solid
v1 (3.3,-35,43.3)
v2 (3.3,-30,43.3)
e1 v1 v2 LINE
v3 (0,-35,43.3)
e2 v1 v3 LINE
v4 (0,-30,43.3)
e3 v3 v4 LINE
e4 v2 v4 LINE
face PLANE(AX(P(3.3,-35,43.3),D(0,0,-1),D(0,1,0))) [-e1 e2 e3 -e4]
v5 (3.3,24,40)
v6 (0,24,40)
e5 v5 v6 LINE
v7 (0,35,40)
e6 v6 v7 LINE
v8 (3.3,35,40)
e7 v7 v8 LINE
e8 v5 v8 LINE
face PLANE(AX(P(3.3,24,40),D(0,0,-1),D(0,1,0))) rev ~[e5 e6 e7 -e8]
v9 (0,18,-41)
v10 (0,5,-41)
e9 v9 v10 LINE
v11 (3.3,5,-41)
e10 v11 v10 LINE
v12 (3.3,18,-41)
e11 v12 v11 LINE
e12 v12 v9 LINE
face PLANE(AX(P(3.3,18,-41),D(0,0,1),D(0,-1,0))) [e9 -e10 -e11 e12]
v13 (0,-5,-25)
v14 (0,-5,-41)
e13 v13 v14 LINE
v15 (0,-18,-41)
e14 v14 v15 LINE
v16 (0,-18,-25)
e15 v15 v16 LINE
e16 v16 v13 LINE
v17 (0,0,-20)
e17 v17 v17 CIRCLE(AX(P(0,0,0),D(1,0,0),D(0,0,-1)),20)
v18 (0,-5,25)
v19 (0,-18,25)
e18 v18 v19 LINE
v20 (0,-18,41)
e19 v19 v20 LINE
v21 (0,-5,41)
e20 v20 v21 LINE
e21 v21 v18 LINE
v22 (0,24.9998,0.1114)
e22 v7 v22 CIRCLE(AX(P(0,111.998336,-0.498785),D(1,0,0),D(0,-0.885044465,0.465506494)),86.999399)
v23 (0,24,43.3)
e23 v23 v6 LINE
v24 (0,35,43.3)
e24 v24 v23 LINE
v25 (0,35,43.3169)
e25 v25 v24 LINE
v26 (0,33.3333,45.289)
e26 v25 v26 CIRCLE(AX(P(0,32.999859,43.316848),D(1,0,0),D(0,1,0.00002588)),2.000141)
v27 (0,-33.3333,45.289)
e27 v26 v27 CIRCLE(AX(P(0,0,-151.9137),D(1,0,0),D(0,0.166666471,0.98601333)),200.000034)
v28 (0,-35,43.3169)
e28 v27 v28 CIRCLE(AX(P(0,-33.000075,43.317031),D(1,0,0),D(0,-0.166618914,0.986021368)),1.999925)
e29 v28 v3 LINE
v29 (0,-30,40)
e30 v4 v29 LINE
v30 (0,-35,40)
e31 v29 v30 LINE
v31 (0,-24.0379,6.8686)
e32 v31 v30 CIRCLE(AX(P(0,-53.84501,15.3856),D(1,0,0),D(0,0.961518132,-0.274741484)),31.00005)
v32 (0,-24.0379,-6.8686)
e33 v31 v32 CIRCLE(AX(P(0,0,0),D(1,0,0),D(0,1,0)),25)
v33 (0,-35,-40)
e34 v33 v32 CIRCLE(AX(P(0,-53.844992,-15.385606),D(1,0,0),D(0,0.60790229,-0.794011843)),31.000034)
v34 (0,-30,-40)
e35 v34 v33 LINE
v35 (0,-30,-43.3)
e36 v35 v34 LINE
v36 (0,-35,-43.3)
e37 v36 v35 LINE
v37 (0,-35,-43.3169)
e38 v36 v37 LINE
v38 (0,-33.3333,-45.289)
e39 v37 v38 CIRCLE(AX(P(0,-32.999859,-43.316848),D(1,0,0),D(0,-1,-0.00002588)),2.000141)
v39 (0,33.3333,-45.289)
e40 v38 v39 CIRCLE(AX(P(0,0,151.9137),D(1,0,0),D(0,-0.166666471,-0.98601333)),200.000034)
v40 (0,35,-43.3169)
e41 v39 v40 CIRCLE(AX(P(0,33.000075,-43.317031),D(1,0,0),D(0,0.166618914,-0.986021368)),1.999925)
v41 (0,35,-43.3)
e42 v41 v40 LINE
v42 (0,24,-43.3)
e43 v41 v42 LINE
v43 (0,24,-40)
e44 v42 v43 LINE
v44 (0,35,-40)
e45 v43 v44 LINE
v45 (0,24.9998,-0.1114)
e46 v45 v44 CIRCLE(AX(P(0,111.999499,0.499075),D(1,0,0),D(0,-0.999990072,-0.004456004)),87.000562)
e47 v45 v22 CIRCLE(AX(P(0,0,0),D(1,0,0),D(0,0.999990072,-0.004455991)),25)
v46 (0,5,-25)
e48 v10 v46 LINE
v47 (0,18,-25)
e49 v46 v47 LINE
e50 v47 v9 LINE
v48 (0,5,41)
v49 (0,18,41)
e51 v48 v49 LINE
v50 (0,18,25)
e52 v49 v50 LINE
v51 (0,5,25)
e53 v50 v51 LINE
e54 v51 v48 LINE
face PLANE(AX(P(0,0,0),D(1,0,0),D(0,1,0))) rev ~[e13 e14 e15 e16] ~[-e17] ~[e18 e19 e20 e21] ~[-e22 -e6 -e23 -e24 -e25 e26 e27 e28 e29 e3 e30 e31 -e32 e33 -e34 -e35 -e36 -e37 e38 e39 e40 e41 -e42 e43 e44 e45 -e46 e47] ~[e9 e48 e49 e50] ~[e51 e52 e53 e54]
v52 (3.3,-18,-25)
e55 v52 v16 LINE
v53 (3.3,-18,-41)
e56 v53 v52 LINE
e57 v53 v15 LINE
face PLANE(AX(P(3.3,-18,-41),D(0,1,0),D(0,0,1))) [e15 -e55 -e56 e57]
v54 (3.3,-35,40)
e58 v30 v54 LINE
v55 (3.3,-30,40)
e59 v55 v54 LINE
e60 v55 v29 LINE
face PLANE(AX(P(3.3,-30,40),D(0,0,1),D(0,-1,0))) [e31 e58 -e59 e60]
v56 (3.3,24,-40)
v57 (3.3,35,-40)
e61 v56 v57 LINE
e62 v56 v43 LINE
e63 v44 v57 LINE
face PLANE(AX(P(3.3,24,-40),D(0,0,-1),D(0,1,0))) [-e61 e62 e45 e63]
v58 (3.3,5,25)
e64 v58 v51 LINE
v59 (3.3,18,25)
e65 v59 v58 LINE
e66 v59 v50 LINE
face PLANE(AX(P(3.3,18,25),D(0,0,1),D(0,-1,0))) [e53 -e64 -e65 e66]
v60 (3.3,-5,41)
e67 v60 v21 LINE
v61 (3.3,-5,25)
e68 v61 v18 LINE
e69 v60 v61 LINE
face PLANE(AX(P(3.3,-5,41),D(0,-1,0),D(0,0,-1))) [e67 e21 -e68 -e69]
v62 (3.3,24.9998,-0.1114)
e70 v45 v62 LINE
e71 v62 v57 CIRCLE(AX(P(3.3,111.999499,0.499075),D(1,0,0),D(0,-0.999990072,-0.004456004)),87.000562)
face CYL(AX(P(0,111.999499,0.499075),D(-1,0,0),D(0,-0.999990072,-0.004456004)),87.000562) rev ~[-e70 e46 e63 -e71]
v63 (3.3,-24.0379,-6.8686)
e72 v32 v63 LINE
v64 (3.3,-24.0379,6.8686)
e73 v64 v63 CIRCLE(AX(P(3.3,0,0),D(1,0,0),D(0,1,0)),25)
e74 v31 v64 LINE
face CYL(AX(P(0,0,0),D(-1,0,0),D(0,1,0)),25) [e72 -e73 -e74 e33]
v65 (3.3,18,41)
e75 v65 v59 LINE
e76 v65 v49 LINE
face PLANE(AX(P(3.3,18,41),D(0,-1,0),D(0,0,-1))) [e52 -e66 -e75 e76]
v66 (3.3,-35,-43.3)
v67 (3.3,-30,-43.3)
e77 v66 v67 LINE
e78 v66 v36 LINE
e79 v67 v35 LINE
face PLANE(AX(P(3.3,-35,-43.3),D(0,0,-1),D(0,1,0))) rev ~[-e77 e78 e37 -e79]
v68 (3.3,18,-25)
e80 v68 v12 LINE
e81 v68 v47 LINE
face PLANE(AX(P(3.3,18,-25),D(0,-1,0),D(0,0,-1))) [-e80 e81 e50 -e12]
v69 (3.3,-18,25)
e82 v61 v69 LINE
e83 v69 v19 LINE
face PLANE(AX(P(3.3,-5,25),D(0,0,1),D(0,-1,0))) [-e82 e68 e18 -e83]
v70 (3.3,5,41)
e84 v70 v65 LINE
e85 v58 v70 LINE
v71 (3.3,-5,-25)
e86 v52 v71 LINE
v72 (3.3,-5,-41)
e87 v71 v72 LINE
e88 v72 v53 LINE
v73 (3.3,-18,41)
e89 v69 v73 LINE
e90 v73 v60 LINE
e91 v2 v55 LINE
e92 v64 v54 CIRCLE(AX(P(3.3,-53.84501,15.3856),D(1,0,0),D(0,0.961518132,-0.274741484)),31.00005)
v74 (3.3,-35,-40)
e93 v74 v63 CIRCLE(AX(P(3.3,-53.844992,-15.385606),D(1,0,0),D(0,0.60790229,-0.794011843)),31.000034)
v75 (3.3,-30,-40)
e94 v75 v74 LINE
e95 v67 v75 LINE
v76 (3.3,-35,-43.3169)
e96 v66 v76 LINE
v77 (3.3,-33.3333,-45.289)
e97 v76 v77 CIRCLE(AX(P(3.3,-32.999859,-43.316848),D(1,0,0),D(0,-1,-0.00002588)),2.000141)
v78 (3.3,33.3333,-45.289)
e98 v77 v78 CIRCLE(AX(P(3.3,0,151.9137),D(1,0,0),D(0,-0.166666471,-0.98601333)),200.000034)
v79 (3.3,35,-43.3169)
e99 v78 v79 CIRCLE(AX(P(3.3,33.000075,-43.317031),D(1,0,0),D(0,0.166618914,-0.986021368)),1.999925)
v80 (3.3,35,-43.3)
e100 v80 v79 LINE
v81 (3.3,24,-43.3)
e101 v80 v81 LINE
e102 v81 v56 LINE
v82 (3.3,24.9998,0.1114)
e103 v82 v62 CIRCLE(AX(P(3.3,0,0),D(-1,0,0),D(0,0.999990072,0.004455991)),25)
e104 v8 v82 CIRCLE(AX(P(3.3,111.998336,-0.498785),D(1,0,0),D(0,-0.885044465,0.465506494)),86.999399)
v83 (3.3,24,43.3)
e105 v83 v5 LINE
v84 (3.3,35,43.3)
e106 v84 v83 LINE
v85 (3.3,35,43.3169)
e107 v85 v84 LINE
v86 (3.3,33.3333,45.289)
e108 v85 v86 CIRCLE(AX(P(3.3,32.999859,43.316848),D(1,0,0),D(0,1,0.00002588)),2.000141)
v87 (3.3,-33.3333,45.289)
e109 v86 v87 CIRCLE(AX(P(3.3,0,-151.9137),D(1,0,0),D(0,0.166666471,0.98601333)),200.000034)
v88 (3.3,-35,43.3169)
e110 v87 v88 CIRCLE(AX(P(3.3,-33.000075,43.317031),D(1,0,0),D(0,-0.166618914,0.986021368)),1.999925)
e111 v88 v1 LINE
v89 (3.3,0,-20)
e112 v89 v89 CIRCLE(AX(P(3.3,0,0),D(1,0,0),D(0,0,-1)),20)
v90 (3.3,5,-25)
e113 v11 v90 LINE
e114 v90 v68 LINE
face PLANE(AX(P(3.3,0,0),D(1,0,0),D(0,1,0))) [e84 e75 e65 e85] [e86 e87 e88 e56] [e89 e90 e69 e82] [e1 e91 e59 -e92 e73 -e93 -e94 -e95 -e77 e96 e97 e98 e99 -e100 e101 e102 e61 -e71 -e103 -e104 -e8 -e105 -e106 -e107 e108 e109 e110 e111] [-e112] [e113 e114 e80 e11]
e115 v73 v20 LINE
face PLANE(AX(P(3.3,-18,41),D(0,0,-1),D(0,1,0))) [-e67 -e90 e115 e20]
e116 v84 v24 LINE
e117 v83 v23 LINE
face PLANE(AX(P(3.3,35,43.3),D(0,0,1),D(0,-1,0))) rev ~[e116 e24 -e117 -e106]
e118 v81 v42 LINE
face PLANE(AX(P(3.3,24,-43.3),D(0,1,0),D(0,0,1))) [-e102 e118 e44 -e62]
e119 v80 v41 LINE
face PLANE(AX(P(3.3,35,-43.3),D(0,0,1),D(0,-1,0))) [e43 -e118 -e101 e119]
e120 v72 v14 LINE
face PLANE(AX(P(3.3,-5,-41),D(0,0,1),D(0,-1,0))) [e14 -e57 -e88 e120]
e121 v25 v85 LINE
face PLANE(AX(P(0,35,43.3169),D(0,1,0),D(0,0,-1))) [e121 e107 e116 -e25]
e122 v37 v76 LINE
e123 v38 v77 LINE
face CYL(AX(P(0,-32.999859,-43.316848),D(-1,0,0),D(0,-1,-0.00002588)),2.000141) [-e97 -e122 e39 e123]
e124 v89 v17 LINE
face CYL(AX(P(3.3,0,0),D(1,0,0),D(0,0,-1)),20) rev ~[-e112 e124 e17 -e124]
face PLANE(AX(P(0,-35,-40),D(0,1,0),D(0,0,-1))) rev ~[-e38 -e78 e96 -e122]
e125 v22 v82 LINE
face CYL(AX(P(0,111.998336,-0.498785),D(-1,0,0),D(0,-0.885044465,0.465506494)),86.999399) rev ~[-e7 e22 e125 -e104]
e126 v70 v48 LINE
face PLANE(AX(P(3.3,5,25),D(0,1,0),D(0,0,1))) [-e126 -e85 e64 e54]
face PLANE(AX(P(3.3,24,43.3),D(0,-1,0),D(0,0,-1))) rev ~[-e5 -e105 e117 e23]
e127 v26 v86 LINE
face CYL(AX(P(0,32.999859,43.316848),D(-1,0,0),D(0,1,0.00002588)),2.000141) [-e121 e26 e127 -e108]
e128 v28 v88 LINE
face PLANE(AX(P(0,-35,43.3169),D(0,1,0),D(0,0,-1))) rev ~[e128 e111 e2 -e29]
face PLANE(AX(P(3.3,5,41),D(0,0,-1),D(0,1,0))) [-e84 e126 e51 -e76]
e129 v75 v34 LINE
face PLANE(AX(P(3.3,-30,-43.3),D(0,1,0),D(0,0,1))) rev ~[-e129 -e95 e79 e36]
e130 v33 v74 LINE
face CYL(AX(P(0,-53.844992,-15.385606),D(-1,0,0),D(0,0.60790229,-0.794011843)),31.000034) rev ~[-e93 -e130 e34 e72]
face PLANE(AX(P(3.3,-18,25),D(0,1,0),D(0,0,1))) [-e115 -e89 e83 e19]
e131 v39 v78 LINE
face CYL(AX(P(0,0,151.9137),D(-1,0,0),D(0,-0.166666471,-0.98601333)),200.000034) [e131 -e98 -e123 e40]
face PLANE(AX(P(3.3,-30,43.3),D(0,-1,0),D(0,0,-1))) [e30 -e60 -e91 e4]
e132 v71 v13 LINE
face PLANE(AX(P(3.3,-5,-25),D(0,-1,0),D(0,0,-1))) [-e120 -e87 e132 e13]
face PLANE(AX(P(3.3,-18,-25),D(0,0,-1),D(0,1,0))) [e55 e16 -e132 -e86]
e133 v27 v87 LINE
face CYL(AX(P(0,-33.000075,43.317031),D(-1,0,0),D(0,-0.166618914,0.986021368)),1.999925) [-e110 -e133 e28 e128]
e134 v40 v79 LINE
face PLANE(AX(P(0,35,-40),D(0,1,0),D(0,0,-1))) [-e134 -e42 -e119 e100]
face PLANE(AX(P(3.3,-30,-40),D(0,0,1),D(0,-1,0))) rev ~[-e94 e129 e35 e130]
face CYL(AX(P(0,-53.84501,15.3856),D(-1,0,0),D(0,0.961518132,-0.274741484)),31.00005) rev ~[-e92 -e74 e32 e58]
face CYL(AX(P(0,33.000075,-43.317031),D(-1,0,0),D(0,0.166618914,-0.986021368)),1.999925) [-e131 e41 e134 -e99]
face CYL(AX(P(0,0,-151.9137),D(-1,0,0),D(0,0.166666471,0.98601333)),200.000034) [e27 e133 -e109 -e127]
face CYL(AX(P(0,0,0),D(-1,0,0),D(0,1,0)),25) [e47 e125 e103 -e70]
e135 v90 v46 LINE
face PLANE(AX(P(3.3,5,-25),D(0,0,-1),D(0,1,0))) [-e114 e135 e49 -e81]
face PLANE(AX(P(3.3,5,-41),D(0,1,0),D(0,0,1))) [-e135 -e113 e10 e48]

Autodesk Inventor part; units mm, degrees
ref_plane "YZ Plane" through (0, 0, 0) normal (1, 0, 0) x (0, 1, 0)
ref_plane "XZ Plane" through (0, 0, 0) normal (0, 1, 0) x (-1, 0, 0)
ref_plane "XY Plane" through (0, 0, 0) normal (0, 0, 1) x (1, 0, 0)
sketch "Boceto1" plane through (0, 0, 0) normal (1, 0, 0) x (0, 1, 0)
  circle A0 centre (0, 0) radius 25
  line L0 (35, 43.3169) -> (35, 40)
  line L1 (-35, 43.3169) -> (-35, 40)
  line L2 (35, -40) -> (35, -43.3169)
  line L3 (-35, -40) -> (-35, -43.3169)
  arc A1 (33.3333, 45.289) -> (-33.3333, 45.289) centre (0, -151.9137) ccw
  arc A2 (-33.3333, -45.289) -> (33.3333, -45.289) centre (0, 151.9137) ccw
  arc A3 (-24.0379, 6.8686) -> (-35, 40) centre (-53.845, 15.3856) ccw
  arc A4 (-35, -40) -> (-24.0379, -6.8686) centre (-53.845, -15.3856) ccw
  arc A5 (35, 40) -> (24.9998, -0.1114) centre (111.9989, -0.499) ccw
  arc A6 (24.9998, 0.1114) -> (35, -40) centre (111.9989, 0.499) ccw
  arc A7 (35, 43.3169) -> (33.3333, 45.289) centre (33, 43.3169) ccw
  arc A8 (-33.3333, 45.289) -> (-35, 43.3169) centre (-33, 43.3169) ccw
  arc A9 (33.3333, -45.289) -> (35, -43.3169) centre (33, -43.3169) ccw
  arc A10 (-35, -43.3169) -> (-33.3333, -45.289) centre (-33, -43.3169) ccw
  point P0 (35, 45)
  point P1 (-35, 45)
  point P2 (35, -45)
  point P3 (-35, -45)
  dimension "d0" = 50
  dimension "d1" = 5
  dimension "d2" = 70
  dimension "d3" = 35
  dimension "d4" = 0
  dimension "d5" = 70
  dimension "d6" = 0
  dimension "d8" = 40
  dimension "d9" = 40
  dimension "d10" = 200
  dimension "d12" = 200
  dimension "d13" = 31
  dimension "d14" = 31
  dimension "d15" = 87
  dimension "d17" = 87
  dimension "d20" = 2
  dimension "d21" = 2
  dimension "d22" = 2
extrude "Extrusión1" add sketch "Boceto1" along normal blind 3.3
sketch "Boceto2" plane through (3.3, 0, 0) normal (1, 0, 0) x (0, 0, -1)
  arc A0 (-40, 35) -> (0, 25.0003) centre (0.499, 111.9989) ccw projected
  arc A1 (40, -35) -> (6.8686, -24.0379) centre (15.3856, -53.845) ccw projected
  arc A2 (0, 25.0003) -> (40, 35) centre (-0.499, 111.9989) ccw projected
  arc A3 (-6.8686, -24.0379) -> (-40, -35) centre (-15.3856, -53.845) ccw projected
  line L0 (-40, 35) -> (-43.3, 35)
  line L1 (-43.3, 35) -> (-43.3, 24)
  line L2 (-43.3, 24) -> (-40, 24)
  line L3 (-40, 24) -> (-40, 35)
  line L4 (-40, -35) -> (-43.3, -35)
  line L5 (-43.3, -35) -> (-43.3, -30)
  line L6 (-43.3, -30) -> (-40, -30)
  line L7 (-40, -30) -> (-40, -35)
  line L8 (40, 35) -> (43.3, 35)
  line L9 (43.3, 35) -> (43.3, 24)
  line L10 (43.3, 24) -> (40, 24)
  line L11 (40, 24) -> (40, 35)
  line L12 (40, -35) -> (43.3, -35)
  line L13 (43.3, -35) -> (43.3, -30)
  line L14 (43.3, -30) -> (40, -30)
  line L15 (40, -30) -> (40, -35)
  circle A4 centre (0, 0) radius 20
  line L16 (-41, 18) -> (-25, 18)
  line L17 (-25, 18) -> (-25, 5)
  line L18 (-25, 5) -> (-41, 5)
  line L19 (-41, 5) -> (-41, 18)
  line L20 (-41, -5) -> (-25, -5)
  line L21 (-25, -5) -> (-25, -18)
  line L22 (-25, -18) -> (-41, -18)
  line L23 (-41, -18) -> (-41, -5)
  line L24 (25, 18) -> (41, 18)
  line L25 (41, 18) -> (41, 5)
  line L26 (41, 5) -> (25, 5)
  line L27 (25, 5) -> (25, 18)
  line L28 (25, -5) -> (41, -5)
  line L29 (41, -5) -> (41, -18)
  line L30 (41, -18) -> (25, -18)
  line L31 (25, -18) -> (25, -5)
  point P0 (-6.2262, 34.4418)
  point P1 (12.6899, -32.6185)
  point P2 (6.2262, 34.4418)
  dimension "d31" = 40
  dimension "d23" = 3.3
  dimension "d24" = 3.3
  dimension "d25" = 3.3
  dimension "d26" = 3.3
  dimension "d27" = 11
  dimension "d28" = 5
  dimension "d34" = 16
  dimension "d35" = 13
  dimension "d37" = 25
  dimension "d38" = 5
  dimension "d40" = 5
  dimension "d41" = 25
extrude "Extrusión2" cut sketch "Boceto2" against normal blind 3.3
equation "\"d3\" = 0.5 * d2"
equation "\"d5\" = d2"
equation "\"d8\" = 0.5 * ancho_base"
equation "\"d9\" = d8"
equation "\"d14\" = d13"
equation "\"d17\" = d15"
equation "\"d25\" = d23"
equation "\"d41\" = d37"
equation "\"Radio_pliegue\" = Grosor"
equation "\"Anchura_desahogo_plegado\" = Grosor"
equation "\"Profundidad_desahogo_plegado\" = 0.5 * Grosor"
equation "\"Tamaño_destalonado\" = 4 * Grosor"
equation "\"Remanente_mínimo\" = 2 * Grosor"
equation "\"Radiodetransición\" = Radio_pliegue"
equation "\"Tamaño_de_radio_de_Jacobi\" = Grosor"
equation "\"TamañoSeparación\" = Grosor"
equation "\"Grosor\" = 0.5"
equation "\"ancho_base\" = 80"
properties part number "Cuerpo - Unión Laterales"
